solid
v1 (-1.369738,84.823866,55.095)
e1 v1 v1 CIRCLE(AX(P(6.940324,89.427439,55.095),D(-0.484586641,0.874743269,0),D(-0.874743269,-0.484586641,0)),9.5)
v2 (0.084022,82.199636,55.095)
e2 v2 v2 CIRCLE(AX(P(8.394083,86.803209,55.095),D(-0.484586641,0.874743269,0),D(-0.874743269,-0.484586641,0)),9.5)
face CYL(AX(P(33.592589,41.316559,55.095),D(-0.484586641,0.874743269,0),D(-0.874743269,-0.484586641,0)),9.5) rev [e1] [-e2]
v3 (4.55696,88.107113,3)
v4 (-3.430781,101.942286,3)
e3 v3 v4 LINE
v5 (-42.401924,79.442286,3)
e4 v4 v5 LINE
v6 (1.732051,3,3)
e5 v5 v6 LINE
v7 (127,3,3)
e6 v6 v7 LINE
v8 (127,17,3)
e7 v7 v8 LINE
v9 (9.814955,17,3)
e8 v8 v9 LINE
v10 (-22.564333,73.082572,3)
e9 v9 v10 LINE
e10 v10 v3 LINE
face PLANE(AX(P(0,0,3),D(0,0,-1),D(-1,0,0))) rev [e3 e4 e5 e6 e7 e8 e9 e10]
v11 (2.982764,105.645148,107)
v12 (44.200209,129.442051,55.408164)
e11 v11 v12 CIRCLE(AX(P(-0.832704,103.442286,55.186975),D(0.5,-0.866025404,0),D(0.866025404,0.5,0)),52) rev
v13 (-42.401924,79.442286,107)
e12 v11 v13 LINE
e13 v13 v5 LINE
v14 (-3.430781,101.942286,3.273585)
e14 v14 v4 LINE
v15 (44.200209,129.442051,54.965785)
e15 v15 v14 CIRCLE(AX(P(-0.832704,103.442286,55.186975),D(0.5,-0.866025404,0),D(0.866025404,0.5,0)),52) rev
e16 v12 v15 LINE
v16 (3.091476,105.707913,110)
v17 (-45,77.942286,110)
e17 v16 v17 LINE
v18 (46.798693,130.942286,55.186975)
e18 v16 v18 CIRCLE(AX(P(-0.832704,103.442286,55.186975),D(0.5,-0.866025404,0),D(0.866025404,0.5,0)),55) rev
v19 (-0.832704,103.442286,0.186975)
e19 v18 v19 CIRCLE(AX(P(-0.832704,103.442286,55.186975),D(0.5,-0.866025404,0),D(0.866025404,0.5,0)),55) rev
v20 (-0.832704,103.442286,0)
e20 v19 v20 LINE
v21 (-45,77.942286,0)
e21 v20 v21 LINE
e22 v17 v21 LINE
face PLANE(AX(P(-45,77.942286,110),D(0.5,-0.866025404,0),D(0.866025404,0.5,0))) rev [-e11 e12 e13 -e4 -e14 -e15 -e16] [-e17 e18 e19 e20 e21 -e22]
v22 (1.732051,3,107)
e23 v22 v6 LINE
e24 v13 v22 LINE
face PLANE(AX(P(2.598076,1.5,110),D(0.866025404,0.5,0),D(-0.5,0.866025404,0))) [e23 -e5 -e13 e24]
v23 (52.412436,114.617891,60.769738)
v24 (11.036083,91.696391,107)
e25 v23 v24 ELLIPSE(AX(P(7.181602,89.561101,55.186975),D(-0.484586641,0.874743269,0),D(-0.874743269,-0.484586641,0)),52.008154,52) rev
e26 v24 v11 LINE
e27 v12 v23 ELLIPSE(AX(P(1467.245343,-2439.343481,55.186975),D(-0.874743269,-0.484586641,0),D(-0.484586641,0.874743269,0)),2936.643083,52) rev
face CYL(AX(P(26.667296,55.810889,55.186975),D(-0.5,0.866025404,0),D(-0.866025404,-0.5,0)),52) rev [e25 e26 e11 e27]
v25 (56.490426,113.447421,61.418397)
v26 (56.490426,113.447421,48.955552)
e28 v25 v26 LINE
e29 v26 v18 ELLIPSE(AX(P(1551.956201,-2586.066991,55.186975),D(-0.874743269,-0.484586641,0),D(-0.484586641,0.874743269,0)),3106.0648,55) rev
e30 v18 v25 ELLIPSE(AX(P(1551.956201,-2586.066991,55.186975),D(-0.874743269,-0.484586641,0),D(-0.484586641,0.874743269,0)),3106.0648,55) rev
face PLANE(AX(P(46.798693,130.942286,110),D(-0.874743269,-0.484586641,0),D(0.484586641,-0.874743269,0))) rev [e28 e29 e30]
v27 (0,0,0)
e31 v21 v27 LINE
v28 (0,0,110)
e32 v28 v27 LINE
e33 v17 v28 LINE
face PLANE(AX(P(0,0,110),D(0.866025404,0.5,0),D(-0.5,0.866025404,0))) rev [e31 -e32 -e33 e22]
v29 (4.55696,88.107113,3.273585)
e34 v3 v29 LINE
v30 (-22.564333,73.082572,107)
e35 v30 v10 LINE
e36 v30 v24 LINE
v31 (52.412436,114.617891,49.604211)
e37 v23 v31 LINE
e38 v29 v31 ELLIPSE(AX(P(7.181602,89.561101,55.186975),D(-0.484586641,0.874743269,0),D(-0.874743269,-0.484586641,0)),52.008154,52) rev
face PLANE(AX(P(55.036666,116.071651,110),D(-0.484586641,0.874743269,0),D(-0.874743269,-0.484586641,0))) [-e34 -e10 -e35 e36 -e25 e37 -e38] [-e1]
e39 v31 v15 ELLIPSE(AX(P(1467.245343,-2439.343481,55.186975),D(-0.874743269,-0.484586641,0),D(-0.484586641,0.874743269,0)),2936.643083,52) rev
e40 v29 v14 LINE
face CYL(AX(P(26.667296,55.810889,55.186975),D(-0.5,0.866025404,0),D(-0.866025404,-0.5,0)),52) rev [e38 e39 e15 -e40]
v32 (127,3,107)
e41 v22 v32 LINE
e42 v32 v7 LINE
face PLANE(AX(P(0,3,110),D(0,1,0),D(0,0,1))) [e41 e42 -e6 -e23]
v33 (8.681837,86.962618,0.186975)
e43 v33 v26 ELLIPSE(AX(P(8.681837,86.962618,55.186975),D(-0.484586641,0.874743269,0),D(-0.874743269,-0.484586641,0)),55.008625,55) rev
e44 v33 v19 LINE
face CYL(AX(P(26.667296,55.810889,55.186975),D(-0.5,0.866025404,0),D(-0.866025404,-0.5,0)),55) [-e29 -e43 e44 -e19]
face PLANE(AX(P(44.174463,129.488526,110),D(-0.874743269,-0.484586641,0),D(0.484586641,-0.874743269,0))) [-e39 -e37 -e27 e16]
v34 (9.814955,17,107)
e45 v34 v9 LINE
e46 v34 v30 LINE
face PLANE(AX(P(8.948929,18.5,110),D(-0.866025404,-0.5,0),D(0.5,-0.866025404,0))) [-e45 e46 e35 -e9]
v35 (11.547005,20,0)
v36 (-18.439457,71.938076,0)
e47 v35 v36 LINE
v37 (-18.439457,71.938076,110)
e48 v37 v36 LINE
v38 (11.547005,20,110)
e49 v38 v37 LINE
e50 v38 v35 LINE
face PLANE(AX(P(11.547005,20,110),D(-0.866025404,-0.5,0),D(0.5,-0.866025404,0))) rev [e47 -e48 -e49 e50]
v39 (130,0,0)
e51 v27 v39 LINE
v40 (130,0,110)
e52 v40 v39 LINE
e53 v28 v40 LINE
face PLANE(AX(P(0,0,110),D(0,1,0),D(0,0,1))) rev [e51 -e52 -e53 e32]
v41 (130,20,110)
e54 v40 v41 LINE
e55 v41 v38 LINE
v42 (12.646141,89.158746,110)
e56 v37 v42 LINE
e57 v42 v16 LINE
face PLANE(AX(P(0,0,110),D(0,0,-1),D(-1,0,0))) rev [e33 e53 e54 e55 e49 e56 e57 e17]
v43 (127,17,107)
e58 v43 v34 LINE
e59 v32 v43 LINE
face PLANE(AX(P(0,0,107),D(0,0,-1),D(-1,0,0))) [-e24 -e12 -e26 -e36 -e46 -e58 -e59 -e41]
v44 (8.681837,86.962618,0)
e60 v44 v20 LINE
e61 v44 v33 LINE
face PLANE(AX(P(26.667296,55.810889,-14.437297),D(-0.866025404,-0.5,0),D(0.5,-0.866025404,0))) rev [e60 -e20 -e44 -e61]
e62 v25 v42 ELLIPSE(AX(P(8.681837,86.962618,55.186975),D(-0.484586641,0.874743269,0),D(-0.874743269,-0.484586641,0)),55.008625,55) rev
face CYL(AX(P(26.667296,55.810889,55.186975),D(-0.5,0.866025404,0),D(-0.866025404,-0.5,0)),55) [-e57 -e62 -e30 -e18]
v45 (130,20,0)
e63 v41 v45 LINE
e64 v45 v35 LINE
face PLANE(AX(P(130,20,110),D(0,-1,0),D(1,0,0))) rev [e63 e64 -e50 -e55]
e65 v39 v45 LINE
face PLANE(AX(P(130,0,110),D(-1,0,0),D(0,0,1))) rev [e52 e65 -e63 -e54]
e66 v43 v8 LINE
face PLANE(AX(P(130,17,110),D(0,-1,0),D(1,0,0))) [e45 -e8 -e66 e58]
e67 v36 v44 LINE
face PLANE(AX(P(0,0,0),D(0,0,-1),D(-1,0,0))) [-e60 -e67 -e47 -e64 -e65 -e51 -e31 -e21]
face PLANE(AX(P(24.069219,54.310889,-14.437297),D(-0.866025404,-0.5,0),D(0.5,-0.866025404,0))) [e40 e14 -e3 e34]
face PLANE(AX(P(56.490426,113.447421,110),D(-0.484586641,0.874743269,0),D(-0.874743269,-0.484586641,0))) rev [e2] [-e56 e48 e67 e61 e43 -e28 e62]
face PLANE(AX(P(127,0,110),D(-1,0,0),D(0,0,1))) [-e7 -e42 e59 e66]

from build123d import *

# Parameters (mm, degrees)
SALIENTE_EXTRUIR1_DEPTH = 110
CORTAR_EXTRUIR9_DEPTH   = 55
VACIADO3_START          = 3.186974639
VACIADO3_DEPTH          = 103.813025361
VACIADO3_START_2        = 3
VACIADO3_2_DEPTH        = 0.273585229
VACIADO3_START_3        = -90
VACIADO3_3_DEPTH        = 16.944212752
CROQUIS7_R              = 9.5
CORTAR_EXTRUIR10_DEPTH  = 55


with BuildPart() as part:
    # Croquis1 → Saliente-Extruir1 (new body)
    with BuildSketch(Plane.XY):
        Polygon((0, 0), (130, 0), (130, 20), (11.547005384, 20), (-18.439456819, 71.938076074), (56.490425623, 113.447420953), (46.798692801, 130.942286341), (-45, 77.942286341), align=None)
    extrude(amount=SALIENTE_EXTRUIR1_DEPTH)

    # Croquis6 → Cortar-Extruir9 (cut, symmetric)
    with BuildSketch(Plane(origin=(-45, 77.942286341, 0), x_dir=(0.8660254037844362, 0.5000000000000044, 0), z_dir=(-0.5000000000000043, 0.866025403784436, 0))):
        with BuildLine():
            Line((51, -110.186974639), (51, -125.465118776))
            Line((51, -125.465118776), (118.324922333, -125.465118776))
            Line((118.324922333, -125.465118776), (118.324922333, 14.437296871))
            Line((118.324922333, 14.437296871), (51, 14.437296871))
            Line((51, 14.437296871), (51, -0.186974639))
            ThreePointArc((51, -0.186974639), (106, -55.186974639), (51, -110.186974639))
        make_face()
    extrude(amount=CORTAR_EXTRUIR9_DEPTH, both=True, mode=Mode.SUBTRACT)

    # Vaciado3: read off the stored shape, not the designer's step
    # Vaciado3 outline → Vaciado3 (cut)
    with BuildSketch(Plane.XY.offset(VACIADO3_START)):
        Polygon((52.412435892, 114.617890838), (44.200209183, 129.442051124), (-42.401923789, 79.442286341), (1.732050808, 3), (127, 3), (127, 17), (9.814954576, 17), (-22.564333351, 73.082571803), align=None)
    extrude(amount=VACIADO3_DEPTH, mode=Mode.SUBTRACT)

    # Vaciado3 2 outline → Vaciado3 2 (cut)
    with BuildSketch(Plane.XY.offset(VACIADO3_START_2)):
        Polygon((4.556960249, 88.107113321), (-3.430780618, 101.942286341), (-42.401923789, 79.442286341), (1.732050808, 3), (127, 3), (127, 17), (9.814954576, 17), (-22.564333351, 73.082571803), align=None)
    extrude(amount=VACIADO3_2_DEPTH, mode=Mode.SUBTRACT)

    # Vaciado3 3 outline → Vaciado3 3 (add)
    with BuildSketch(Plane(origin=(0, 0, 0), x_dir=(0.8660254037844362, 0.5000000000000042, 0), z_dir=(0.5000000000000042, -0.8660254037844363, 0)).offset(VACIADO3_START_3)):
        with BuildLine():
            ThreePointArc((68.916472868, 3.186974639), (89.973499173, 16.3789038), (103.075739879, 37.491853388))
            Line((103.075739879, 37.491853388), (103.000470437, 55.186974639))
            Line((103.000470437, 55.186974639), (102.999529567, 54.965785108))
            ThreePointArc((102.999529567, 54.965785108), (87.691266975, 18.339302693), (51, 3.186974639))
            Line((51, 3.186974639), (68.916472868, 3.186974639))
        make_face()
        with BuildLine():
            Line((103.000470437, 55.186974639), (103.075739879, 72.882095888))
            ThreePointArc((103.075739879, 72.882095888), (90.172508138, 93.794157987), (69.450214169, 107))
            Line((69.450214169, 107), (55.405723879, 107))
            ThreePointArc((55.405723879, 107), (89.220642789, 90.445767369), (102.999529567, 55.408164169))
            Line((102.999529567, 55.408164169), (103.000470437, 55.186974639))
        make_face()
        with BuildLine():
            Line((48, 3.186974639), (51, 3.186974639))
            ThreePointArc((51, 3.186974639), (49.499375014, 3.208631796), (48, 3.273585229))
            Line((48, 3.273585229), (48, 3.186974639))
        make_face()
    extrude(amount=VACIADO3_3_DEPTH)

    # Croquis7 → Cortar-Extruir10 (cut, symmetric)
    with BuildSketch(Plane(origin=(-36.277542983, 65.485784921, 0), x_dir=(0.874743269355894, 0.4845866410834722, 0), z_dir=(-0.4845866410834722, 0.874743269355894, 0))):
        with Locations(Location((49.406343615, -55.095, 0), (0, 0, 180))):
            Circle(CROQUIS7_R)
    extrude(amount=CORTAR_EXTRUIR10_DEPTH, both=True, mode=Mode.SUBTRACT)


solid = part.part
